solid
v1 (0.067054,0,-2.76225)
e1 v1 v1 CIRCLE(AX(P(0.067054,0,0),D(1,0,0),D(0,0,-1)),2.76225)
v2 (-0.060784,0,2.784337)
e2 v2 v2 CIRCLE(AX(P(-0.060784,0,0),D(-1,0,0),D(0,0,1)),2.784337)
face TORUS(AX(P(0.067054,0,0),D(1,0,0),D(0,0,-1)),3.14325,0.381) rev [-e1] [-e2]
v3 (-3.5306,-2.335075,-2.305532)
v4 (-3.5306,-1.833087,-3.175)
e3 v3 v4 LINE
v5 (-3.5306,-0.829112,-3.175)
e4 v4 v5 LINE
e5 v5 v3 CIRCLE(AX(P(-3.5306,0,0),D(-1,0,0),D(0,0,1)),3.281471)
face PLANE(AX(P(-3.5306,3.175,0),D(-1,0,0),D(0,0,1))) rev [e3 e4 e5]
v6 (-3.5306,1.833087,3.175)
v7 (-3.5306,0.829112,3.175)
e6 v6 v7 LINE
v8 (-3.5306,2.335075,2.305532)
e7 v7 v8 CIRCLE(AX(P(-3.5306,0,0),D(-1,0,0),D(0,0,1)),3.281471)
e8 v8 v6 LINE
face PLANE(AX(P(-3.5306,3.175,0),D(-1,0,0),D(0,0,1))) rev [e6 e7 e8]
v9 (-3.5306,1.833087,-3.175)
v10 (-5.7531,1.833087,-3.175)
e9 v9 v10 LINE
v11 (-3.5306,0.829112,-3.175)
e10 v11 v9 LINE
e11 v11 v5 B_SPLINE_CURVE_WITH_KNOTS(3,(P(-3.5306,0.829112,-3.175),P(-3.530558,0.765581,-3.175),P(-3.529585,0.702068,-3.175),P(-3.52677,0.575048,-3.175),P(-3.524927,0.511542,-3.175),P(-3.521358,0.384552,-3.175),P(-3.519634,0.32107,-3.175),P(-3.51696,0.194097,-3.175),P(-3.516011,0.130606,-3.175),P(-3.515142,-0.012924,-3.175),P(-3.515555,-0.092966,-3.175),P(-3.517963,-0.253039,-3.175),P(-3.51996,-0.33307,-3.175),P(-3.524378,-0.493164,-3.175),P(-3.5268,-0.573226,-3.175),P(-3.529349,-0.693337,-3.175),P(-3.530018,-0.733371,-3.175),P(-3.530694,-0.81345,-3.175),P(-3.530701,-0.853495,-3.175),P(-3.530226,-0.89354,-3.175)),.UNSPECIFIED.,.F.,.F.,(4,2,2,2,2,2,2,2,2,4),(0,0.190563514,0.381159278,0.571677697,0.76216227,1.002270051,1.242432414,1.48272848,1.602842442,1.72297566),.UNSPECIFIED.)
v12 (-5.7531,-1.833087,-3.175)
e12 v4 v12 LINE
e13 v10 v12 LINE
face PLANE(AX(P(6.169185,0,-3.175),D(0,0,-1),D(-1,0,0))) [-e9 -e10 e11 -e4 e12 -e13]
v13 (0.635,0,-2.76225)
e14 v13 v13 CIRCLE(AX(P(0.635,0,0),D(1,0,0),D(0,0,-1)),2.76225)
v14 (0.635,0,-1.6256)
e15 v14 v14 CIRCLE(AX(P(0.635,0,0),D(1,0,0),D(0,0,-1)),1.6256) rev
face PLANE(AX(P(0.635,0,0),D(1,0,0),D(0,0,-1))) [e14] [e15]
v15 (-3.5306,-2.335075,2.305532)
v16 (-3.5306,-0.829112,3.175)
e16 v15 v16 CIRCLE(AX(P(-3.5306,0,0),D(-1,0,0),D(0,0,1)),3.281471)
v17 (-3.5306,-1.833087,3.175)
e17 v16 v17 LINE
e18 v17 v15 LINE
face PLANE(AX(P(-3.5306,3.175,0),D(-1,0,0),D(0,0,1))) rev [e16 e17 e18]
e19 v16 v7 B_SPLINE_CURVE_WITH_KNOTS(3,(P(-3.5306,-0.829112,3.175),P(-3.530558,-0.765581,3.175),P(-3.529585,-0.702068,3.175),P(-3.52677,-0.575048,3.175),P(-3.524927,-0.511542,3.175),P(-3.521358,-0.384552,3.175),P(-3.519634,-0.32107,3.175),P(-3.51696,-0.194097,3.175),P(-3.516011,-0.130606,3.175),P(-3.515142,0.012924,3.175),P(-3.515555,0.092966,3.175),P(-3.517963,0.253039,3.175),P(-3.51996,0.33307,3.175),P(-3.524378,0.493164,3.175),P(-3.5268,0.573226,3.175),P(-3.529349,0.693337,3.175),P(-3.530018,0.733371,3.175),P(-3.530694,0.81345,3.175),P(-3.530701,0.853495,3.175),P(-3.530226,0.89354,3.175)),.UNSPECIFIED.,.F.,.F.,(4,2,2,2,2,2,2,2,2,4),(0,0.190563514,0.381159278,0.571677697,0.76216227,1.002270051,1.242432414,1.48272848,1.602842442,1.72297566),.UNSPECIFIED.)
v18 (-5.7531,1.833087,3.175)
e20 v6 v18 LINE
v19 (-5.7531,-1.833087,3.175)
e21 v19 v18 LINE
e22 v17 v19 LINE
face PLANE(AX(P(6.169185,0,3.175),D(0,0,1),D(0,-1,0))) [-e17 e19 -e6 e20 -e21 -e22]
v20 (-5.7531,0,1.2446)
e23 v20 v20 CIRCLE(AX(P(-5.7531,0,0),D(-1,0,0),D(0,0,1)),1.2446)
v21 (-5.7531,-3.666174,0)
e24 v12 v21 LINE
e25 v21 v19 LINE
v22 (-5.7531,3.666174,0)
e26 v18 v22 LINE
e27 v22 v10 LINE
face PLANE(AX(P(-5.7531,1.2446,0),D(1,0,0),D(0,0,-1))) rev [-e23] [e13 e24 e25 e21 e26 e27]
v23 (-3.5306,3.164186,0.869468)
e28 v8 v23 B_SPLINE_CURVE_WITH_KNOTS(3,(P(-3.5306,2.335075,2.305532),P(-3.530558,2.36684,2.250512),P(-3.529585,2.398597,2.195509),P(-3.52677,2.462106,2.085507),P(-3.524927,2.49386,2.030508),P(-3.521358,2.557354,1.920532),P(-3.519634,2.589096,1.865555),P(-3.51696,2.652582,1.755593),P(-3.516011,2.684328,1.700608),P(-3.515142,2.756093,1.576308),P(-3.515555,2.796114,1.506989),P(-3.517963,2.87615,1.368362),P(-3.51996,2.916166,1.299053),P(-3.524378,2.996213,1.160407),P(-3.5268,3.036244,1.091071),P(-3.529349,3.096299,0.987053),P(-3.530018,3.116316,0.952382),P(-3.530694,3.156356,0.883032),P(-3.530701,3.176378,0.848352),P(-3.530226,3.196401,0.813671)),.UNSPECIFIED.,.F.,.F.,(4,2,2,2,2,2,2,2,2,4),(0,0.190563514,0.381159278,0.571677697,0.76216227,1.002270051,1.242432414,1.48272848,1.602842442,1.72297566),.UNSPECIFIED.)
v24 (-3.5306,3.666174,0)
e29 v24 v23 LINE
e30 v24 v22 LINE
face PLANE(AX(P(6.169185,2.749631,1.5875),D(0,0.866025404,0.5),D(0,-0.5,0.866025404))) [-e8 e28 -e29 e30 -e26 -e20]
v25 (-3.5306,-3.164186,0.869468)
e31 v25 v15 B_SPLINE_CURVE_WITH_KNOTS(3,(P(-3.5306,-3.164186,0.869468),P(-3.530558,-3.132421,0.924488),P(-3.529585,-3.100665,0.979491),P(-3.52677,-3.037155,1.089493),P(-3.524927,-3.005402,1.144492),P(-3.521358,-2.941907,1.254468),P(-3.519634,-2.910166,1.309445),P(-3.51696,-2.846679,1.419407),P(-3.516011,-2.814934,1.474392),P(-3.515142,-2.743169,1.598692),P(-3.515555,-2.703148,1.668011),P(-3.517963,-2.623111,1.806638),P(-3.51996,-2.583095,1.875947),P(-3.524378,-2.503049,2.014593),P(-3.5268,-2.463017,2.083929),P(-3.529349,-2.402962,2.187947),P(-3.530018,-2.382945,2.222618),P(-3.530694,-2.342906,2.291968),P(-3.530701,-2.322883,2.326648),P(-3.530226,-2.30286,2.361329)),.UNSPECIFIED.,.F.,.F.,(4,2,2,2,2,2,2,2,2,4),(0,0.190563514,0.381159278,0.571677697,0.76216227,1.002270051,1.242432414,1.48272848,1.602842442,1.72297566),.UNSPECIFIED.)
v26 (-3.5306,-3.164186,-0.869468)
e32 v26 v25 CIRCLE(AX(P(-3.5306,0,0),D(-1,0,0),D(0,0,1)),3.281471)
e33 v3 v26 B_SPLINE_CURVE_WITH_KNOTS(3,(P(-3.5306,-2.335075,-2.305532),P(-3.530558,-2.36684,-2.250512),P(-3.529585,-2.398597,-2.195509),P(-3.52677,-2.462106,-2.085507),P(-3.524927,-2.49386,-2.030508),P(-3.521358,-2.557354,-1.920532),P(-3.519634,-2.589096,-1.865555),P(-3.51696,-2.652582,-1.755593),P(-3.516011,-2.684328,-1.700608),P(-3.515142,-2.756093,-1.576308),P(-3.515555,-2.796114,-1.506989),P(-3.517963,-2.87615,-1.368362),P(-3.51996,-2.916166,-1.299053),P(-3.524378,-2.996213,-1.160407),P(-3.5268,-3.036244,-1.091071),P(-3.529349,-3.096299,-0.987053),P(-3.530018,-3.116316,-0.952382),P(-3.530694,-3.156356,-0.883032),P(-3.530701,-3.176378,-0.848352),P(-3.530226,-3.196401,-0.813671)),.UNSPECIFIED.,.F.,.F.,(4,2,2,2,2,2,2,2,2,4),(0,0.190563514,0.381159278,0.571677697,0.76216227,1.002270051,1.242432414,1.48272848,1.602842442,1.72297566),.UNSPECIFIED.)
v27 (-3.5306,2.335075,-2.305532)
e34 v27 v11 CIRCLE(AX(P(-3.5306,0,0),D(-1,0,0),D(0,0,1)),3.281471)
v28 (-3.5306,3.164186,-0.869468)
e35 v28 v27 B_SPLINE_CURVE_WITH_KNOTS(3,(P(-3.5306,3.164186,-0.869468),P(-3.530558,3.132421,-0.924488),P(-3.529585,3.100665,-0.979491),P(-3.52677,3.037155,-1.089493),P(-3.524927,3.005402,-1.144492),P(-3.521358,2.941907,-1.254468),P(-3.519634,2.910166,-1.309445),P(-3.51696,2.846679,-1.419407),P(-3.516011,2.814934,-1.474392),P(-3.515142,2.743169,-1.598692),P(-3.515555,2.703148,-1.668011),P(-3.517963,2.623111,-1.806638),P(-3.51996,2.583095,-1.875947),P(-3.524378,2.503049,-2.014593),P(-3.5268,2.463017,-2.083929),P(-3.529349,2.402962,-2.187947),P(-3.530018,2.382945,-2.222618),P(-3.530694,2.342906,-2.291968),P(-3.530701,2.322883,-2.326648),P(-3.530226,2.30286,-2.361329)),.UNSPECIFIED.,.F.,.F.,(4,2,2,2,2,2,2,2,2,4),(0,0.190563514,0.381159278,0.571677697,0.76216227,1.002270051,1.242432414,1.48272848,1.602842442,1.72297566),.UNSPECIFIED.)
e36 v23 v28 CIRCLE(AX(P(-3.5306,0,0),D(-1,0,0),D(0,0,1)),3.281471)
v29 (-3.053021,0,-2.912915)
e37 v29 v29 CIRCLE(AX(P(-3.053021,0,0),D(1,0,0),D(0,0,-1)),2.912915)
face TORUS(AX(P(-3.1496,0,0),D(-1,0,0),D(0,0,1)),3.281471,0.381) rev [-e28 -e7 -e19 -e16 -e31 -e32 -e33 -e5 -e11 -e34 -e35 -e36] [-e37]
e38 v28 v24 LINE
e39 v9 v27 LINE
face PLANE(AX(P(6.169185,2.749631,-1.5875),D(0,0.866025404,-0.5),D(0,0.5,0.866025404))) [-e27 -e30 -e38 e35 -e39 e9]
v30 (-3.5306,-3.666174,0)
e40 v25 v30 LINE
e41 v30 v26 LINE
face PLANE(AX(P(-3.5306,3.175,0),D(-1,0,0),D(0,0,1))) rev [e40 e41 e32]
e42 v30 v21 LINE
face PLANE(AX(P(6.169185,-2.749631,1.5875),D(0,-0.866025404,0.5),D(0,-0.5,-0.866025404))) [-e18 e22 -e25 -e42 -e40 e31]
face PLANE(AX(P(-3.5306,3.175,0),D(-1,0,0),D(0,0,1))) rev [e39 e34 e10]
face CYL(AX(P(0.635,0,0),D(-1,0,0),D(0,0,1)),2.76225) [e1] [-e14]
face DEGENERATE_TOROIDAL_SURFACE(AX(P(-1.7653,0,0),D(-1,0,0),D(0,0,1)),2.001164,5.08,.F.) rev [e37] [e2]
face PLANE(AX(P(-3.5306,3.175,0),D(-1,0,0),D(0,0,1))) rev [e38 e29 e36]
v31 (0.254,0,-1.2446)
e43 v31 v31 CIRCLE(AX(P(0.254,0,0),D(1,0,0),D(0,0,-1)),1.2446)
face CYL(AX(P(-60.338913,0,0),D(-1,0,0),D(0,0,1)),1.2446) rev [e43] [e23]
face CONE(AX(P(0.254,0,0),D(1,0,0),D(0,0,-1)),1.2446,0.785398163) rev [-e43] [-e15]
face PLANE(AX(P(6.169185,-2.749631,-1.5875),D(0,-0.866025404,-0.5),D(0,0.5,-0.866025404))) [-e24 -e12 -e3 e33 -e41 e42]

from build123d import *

# Parameters (mm, degrees)
BOSS_EXTRUDE1_START = -2.2225
SKETCH2_R           = 3.175
SKETCH2_R_2         = 1.2446
BOSS_EXTRUDE1_DEPTH = 2.2225
SKETCH3_R           = 2.76225
SKETCH3_R_2         = 1.2446
BOSS_EXTRUDE2_DEPTH = 0.635
FILLET1_R           = 0.381
FILLET2_R           = 0.381
CHAMFER1_SIZE       = 0.381


with BuildPart() as part:
    # Sketch1 → Revolve1 (revolve)
    with BuildSketch(Plane.XY, mode=Mode.PRIVATE) as revolve1_sk:
        with BuildLine():
            Line((0, 1.2446), (-5.7531, 1.2446))
            Line((-5.7531, 1.2446), (-5.7531, 3.175))
            Line((-5.7531, 3.175), (-3.5306, 3.175))
            Line((-3.5306, 3.175), (-3.5306, 2.76225))
            ThreePointArc((-3.5306, 2.76225), (-1.7653, 3.078835688), (0, 2.76225))
            Line((0, 2.76225), (0, 1.2446))
        make_face()
    revolve(revolve1_sk.sketch.rotate(Axis((-60.338913039, 0, 0), (1, 0, 0)), 90), axis=Axis((-60.338913039, 0, 0), (1, 0, 0)))

    # Sketch2 → Boss-Extrude1 (add)
    # profile 1 of 7: a face of its own
    with BuildSketch(Plane.ZY.offset(5.7531).offset(BOSS_EXTRUDE1_START)):
        with BuildLine():
            ThreePointArc((-1.587499996, 2.749630659), (1.5e-08, 3.175), (1.587500022, 2.749630644))
            Line((1.587500022, 2.749630644), (0, 3.666174209))
            Line((0, 3.666174209), (-1.587499996, 2.749630659))
        make_face()
    # profile 2 of 7: a face of its own
    with BuildSketch(Plane.ZY.offset(5.7531).offset(BOSS_EXTRUDE1_START)):
        with BuildLine():
            ThreePointArc((1.587500022, 2.749630644), (2.749630663, 1.587499989), (3.175, 0))
            Line((3.175, 0), (3.175, 1.833087105))
            Line((3.175, 1.833087105), (1.587500022, 2.749630644))
        make_face()
    # profile 3 of 7: a face of its own
    with BuildSketch(Plane.ZY.offset(5.7531).offset(BOSS_EXTRUDE1_START)):
        with BuildLine():
            Line((1.587500022, -2.749630644), (3.175, -1.833087105))
            Line((3.175, -1.833087105), (3.175, 0))
            ThreePointArc((3.175, 0), (2.749630663, -1.587499989), (1.587500022, -2.749630644))
        make_face()
    # profile 4 of 7: a face of its own
    with BuildSketch(Plane.ZY.offset(5.7531).offset(BOSS_EXTRUDE1_START)):
        with BuildLine():
            Line((0, -3.666174209), (1.587500022, -2.749630644))
            ThreePointArc((1.587500022, -2.749630644), (3.9e-08, -3.175), (-1.587499954, -2.749630684))
            Line((-1.587499954, -2.749630684), (0, -3.666174209))
        make_face()
    # profile 5 of 7: a face of its own
    with BuildSketch(Plane.ZY.offset(5.7531).offset(BOSS_EXTRUDE1_START)):
        with BuildLine():
            Line((-3.175, -1.833087105), (-1.587499954, -2.749630684))
            ThreePointArc((-1.587499954, -2.749630684), (-2.749630644, -1.587500023), (-3.175, 0))
            Line((-3.175, 0), (-3.175, -1.833087105))
        make_face()
    # profile 6 of 7: a face of its own
    with BuildSketch(Plane.ZY.offset(5.7531).offset(BOSS_EXTRUDE1_START)):
        with BuildLine():
            ThreePointArc((-3.175, 0), (-2.749630656, 1.587500002), (-1.587499996, 2.749630659))
            Line((-1.587499996, 2.749630659), (-3.175, 1.833087105))
            Line((-3.175, 1.833087105), (-3.175, 0))
        make_face()
    # profile 7 of 7: a face of its own
    with BuildSketch(Plane.ZY.offset(5.7531).offset(BOSS_EXTRUDE1_START)):
        Circle(SKETCH2_R)
        Circle(SKETCH2_R_2, mode=Mode.SUBTRACT)
    extrude(amount=BOSS_EXTRUDE1_DEPTH)

    # Sketch3 → Boss-Extrude2 (add)
    with BuildSketch(Plane(origin=(0, 0, 0), x_dir=(0, 0, -1), z_dir=(1, 0, 0))):
        Circle(SKETCH3_R)
        with Locations(Location((0, 0, 0), (0, 0, 180))):
            Circle(SKETCH3_R_2, mode=Mode.SUBTRACT)
    extrude(amount=BOSS_EXTRUDE2_DEPTH)

    # Fillet1
    # the kernel refuses this fillet: 0.381 mm, written as the material it adds along each edge
    with BuildSketch(Plane(origin=(-3.5306, 0, 0), x_dir=(0, 0, 1), z_dir=(0, 1, 0))) as fillet1_piece_1_section:
        with BuildLine():
            CenterArc((3.281470874, 0.381), FILLET1_R, 165.315967452, 104.684032548)
            Line((3.281470874, 0), (2.76225, 0))
            ThreePointArc((2.76225, 0), (2.84347095, 0.236931857), (2.912914931, 0.47757907))
        make_face()
    fillet1_piece_1 = revolve(axis=Axis((-3.5306, 0, 0), (1, 0, 0)), mode=Mode.PRIVATE)
    fillet1_piece_1 = split(fillet1_piece_1, bisect_by=Plane(origin=(-3.388915245, -4.036268752, -0.641022551), z_dir=(0, 0.8660254037844388, -0.49999999999999983)), keep=Keep.TOP, mode=Mode.PRIVATE)
    fillet1_piece_1 = split(fillet1_piece_1, bisect_by=Plane(origin=(-3.388915245, -1.462992562, -3.816022551), z_dir=(0, 0.8660254037844387, 0.5)), keep=Keep.TOP, mode=Mode.PRIVATE)
    fillet1_piece_1 = split(fillet1_piece_1, bisect_by=Plane(origin=(-3.388915245, 0, -3.175), z_dir=(0, 0, 1)), keep=Keep.TOP, mode=Mode.PRIVATE)
    fillet1_piece_1 = split(fillet1_piece_1, bisect_by=Plane(origin=(-3.388915245, 1.462992562, -3.816022551), z_dir=(0, -0.8660254037844387, 0.49999999999999994)), keep=Keep.TOP, mode=Mode.PRIVATE)
    fillet1_piece_1 = split(fillet1_piece_1, bisect_by=Plane(origin=(-3.388915245, 4.036268752, -0.641022551), z_dir=(0, -0.8660254037844387, -0.49999999999999983)), keep=Keep.TOP, mode=Mode.PRIVATE)
    fillet1_piece_1 = split(fillet1_piece_1, bisect_by=Plane(origin=(-3.388915245, 0, 3.175), z_dir=(0, 0, -1)), keep=Keep.TOP, mode=Mode.PRIVATE)
    add(fillet1_piece_1)

    # Fillet2
    fillet2_edges = [part.edges().sort_by_distance(p)[0] for p in [
        (0, -2.76225, 0),
    ]]
    fillet(fillet2_edges, radius=FILLET2_R)

    # Chamfer1
    chamfer1_edges = [part.edges().sort_by_distance(p)[0] for p in [
        (0.635, 0, -1.2446),
    ]]
    chamfer(chamfer1_edges, length=CHAMFER1_SIZE)


solid = part.part
